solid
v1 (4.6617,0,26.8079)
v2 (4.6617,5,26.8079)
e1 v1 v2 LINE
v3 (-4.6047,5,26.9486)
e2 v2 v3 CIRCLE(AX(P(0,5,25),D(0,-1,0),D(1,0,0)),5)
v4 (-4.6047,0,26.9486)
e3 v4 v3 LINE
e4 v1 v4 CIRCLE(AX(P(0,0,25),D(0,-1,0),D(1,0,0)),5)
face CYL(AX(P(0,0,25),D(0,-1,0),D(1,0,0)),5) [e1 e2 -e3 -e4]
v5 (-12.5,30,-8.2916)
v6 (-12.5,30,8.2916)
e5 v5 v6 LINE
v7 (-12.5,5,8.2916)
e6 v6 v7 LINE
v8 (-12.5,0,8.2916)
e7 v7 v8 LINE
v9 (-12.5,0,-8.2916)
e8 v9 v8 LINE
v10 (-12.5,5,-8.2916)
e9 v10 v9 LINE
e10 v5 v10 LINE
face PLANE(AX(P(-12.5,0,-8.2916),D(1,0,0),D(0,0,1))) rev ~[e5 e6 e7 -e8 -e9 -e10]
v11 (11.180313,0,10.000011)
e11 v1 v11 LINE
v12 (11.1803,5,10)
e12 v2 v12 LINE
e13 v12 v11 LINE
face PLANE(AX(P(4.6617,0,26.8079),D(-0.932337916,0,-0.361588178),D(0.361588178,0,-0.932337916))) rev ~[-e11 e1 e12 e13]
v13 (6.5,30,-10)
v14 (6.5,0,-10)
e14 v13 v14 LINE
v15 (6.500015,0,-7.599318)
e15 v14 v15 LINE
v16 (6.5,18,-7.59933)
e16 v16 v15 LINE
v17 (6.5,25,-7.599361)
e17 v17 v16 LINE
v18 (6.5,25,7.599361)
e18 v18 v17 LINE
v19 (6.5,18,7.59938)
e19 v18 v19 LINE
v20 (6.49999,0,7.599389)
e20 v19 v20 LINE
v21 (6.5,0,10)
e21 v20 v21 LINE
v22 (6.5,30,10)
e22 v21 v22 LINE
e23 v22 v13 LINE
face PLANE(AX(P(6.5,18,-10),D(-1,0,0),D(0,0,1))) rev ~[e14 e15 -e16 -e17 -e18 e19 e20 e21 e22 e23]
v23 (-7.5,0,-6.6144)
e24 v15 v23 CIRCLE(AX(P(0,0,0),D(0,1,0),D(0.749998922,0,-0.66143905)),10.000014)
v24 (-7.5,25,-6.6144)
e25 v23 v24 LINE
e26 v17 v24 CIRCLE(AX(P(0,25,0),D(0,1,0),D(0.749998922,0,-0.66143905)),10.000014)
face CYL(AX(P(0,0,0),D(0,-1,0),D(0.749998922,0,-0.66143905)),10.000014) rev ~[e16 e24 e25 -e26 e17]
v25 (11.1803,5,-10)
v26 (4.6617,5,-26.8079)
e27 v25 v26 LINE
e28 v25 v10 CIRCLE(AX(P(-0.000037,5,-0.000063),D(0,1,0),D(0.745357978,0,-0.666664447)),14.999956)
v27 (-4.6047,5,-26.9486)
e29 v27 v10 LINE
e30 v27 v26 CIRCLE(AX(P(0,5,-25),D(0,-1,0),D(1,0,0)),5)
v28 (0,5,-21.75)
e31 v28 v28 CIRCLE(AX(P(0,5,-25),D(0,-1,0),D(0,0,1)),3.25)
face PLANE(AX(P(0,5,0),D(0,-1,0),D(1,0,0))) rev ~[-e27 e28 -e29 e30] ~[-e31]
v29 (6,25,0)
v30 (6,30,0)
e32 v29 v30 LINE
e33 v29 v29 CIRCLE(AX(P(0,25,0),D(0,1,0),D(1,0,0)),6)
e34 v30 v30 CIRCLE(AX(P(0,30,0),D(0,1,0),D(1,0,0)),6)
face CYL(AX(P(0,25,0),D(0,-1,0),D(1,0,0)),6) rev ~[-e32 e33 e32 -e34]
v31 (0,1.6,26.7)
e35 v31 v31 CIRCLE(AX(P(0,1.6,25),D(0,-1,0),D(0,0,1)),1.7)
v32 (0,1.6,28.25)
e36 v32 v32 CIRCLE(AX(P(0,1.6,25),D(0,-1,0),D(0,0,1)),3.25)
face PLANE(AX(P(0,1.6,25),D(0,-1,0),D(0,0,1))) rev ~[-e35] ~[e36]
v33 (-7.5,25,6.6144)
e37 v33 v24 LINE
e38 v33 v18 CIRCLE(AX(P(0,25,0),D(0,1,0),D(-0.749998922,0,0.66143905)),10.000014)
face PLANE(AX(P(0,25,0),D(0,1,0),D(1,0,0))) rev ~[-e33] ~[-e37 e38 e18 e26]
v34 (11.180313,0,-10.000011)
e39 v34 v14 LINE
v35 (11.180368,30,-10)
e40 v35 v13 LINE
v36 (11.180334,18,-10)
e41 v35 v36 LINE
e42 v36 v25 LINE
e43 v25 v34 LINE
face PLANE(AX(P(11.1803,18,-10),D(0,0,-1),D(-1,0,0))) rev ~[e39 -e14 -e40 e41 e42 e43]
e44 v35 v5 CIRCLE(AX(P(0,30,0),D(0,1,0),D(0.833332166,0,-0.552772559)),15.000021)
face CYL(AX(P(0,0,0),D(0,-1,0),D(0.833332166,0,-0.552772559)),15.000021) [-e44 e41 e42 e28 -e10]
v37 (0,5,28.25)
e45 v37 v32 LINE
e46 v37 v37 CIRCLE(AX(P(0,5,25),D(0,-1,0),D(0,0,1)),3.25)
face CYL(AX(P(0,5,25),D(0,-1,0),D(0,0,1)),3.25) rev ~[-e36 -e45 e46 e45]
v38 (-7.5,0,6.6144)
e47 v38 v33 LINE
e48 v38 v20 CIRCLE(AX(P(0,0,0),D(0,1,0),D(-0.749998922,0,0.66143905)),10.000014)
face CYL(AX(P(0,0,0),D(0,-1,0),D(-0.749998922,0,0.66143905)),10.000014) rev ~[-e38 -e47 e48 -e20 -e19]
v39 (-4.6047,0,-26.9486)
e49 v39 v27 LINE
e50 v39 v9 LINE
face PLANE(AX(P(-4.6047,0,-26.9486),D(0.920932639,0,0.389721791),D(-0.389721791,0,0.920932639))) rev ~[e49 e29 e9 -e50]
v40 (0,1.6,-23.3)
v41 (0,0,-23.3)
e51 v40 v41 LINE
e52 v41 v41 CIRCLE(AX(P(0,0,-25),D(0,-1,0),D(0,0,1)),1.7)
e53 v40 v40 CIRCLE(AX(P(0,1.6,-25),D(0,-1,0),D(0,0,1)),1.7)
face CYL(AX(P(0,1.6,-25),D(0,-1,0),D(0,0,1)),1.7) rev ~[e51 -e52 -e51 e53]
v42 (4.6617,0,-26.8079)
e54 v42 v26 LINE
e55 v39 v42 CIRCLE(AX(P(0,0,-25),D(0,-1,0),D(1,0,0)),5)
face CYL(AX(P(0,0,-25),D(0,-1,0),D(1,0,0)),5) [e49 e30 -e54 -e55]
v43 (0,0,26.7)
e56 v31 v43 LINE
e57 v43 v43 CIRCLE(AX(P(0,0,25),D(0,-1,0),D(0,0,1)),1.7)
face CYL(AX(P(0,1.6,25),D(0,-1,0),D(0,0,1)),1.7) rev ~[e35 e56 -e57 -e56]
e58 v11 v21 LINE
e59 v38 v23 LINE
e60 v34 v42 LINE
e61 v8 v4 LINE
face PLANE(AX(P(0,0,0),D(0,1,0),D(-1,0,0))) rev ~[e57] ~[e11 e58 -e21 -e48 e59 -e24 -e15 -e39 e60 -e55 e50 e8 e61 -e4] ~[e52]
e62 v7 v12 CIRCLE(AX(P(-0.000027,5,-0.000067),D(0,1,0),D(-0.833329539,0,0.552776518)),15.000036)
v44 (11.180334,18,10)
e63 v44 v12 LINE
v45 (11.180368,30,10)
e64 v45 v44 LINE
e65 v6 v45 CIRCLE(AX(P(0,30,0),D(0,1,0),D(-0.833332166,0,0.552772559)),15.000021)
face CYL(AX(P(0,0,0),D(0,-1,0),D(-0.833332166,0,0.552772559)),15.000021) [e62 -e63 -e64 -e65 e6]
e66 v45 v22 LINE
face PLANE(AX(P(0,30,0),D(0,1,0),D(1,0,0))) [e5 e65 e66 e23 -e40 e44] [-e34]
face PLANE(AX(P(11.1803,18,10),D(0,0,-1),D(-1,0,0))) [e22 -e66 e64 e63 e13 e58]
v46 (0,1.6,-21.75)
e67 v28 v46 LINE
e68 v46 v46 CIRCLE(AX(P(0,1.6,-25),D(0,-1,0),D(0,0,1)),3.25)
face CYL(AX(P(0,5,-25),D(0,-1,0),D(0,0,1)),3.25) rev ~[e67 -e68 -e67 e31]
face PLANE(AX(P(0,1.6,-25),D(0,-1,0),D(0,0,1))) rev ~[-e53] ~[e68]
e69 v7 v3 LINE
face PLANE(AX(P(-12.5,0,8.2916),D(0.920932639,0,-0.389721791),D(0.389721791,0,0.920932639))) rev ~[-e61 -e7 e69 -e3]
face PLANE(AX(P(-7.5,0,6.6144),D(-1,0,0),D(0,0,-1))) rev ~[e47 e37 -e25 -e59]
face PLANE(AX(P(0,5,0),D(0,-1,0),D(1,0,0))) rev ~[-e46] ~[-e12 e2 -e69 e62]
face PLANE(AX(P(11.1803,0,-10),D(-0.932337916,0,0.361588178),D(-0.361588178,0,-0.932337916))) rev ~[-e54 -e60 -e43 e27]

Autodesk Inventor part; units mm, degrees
ref_plane "YZ Plane" through (0, 0, 0) normal (1, 0, 0) x (0, 1, 0)
ref_plane "XZ Plane" through (0, 0, 0) normal (0, 1, 0) x (-1, 0, 0)
ref_plane "XY Plane" through (0, 0, 0) normal (0, 0, 1) x (1, 0, 0)
sketch "Sketch1" plane through (0, 0, 0) normal (0, 1, 0) x (-1, 0, 0)
  line L0 (-7.5, 6.6144) -> (7.5, 6.6144) construction
  line L1 (7.5, 6.6144) -> (7.5, -6.6144)
  line L2 (7.5, -6.6144) -> (-7.5, -6.6144) construction
  line L3 (-7.5, -6.6144) -> (-7.5, 6.6144)
  line L4 (-7.5, 6.6144) -> (7.5, -6.6144) construction
  line L5 (7.5, 6.6144) -> (-7.5, -6.6144) construction
  arc A0 (7.5, 6.6144) -> (-7.5, 6.6144) centre (0, 0) ccw
  arc A1 (-7.5, -6.6144) -> (7.5, -6.6144) centre (0, 0) ccw
  line L6 (-12.5, 8.2916) -> (-12.5, -8.2916)
  arc A2 (-12.5, -8.2916) -> (12.5, -8.2916) centre (0, 0) ccw
  line L7 (12.5, -8.2916) -> (12.5, 8.2916)
  arc A3 (12.5, 8.2916) -> (-12.5, 8.2916) centre (0, 0) ccw
  dimension "d1" = 15
  dimension "d2" = 10
  dimension "d3" = 5
extrude "Extrusion1" add sketch "Sketch1" along normal blind 25
sketch "Sketch2" plane through (0, 25, 0) normal (0, 1, 0) x (1, 0, 0)
  arc A0 (12.5, 8.2916) -> (-12.5, 8.2916) centre (0, 0) ccw projected
  line L0 (-12.5, 8.2916) -> (-12.5, -8.2916) projected
  arc A1 (-12.5, -8.2916) -> (12.5, -8.2916) centre (0, 0) ccw projected
  line L1 (12.5, -8.2916) -> (12.5, 8.2916) projected
  line L2 (7.5, 6.6144) -> (7.5, -6.6144) projected
  arc A2 (-7.5, -6.6144) -> (7.5, -6.6144) centre (0, 0) ccw projected
  line L3 (-7.5, -6.6144) -> (-7.5, 6.6144) projected
  arc A3 (7.5, 6.6144) -> (-7.5, 6.6144) centre (0, 0) ccw projected
  circle A4 centre (0, 0) radius 6
  dimension "d6" = 12
extrude "Extrusion2" add sketch "Sketch2" along normal blind 5 contours L1 A1 L0 A0 | L2 A2 L3 A3
sketch "Sketch3" plane through (12.5, 0, 8.2916) normal (1, 0, 0) x (0, 0, -1)
  line L0 (18.2916, 18) -> (-1.7084, 18)
  line L1 (-1.7084, 18) -> (-1.7084, 30)
  line L2 (-1.7084, 30) -> (18.2916, 30)
  line L3 (18.2916, 30) -> (18.2916, 18)
  line L4 (0, 30) -> (16.5831, 30) projected
  point P0 (8.2916, 0)
  point P1 (8.2916, 30)
  dimension "d9" = 12
  dimension "d10" = 20
extrude "Extrusion3" cut sketch "Sketch3" against normal blind 6
sketch "Sketch4" plane through (12.5, 18, 8.2916) normal (0, 1, 0) x (1, 0, 0)
  arc A0 (-1.3197, -1.7084) -> (0, 0) centre (-12.5, 8.2916) ccw projected
  line L0 (0, 16.5831) -> (0, 0) projected
  arc A1 (0, 16.5831) -> (-1.3197, 18.2916) centre (-12.5, 8.2916) ccw projected
  line L1 (-1.3197, 18.2916) -> (-6, 18.2916) projected
  line L2 (-6, 18.2916) -> (-6, 15.8909) projected
  arc A2 (-5, 14.9059) -> (-6, 15.8909) centre (-12.5, 8.2916) ccw projected
  line L3 (-5, 1.6772) -> (-5, 14.9059) projected
  arc A3 (-6, 0.6922) -> (-5, 1.6772) centre (-12.5, 8.2916) ccw projected
  line L4 (-6, 0.6922) -> (-6, -1.7084) projected
  line L5 (-1.3197, -1.7084) -> (-6, -1.7084) projected
  point P0 (-12.5, 8.2916)
extrude "Extrusion4" cut sketch "Sketch4" against normal through all
sketch "Sketch5" plane through (0, 0, 0) normal (0, -1, 0) x (1, 0, 0)
  line L0 (6.5, -10) -> (6.5, -7.5993) projected
  arc A0 (-7.5, -6.6144) -> (6.5, -7.5993) centre (0, 0) ccw projected
  line L1 (-7.5, 6.6144) -> (-7.5, -6.6144) projected
  arc A1 (6.5, 7.5993) -> (-7.5, 6.6144) centre (0, 0) ccw projected
  line L2 (6.5, 7.5993) -> (6.5, 10) projected
  line L3 (6.5, 10) -> (11.1803, 10) projected
  arc A2 (11.1803, 10) -> (-12.5, 8.2916) centre (0, 0) ccw projected
  line L4 (-12.5, -8.2916) -> (-12.5, 8.2916) projected
  arc A3 (-12.5, -8.2916) -> (11.1803, -10) centre (0, 0) ccw projected
  line L5 (11.1803, -10) -> (6.5, -10) projected
  line L6 (0, 25) -> (0, -25)
  circle A4 centre (0, 25) radius 5
  circle A5 centre (0, -25) radius 5
  line L7 (4.6617, 26.8079) -> (11.1803, 10)
  line L8 (11.1803, -10) -> (4.6617, -26.8079)
  line L9 (-4.6047, -26.9486) -> (-12.5, -8.2916)
  line L10 (-12.5, 8.2916) -> (-4.6047, 26.9486)
  dimension "d15" = 50
  dimension "d16" = 10
  dimension "d17" = 10
extrude "Extrusion5" add sketch "Sketch5" against normal blind 5 contours L8 A5 L6 A3 | L6 A5 L9 A3 | A5 | L6 A4 L7 A2 | A2 L10 A4 L6 | A4
sketch "Sketch6" plane through (0, 5, 0) normal (0, 1, 0) x (1, 0, 0)
  line L0 (-12.5, -8.2916) -> (-4.6047, -26.9486) projected
  arc A0 (-4.6047, -26.9486) -> (4.6617, -26.8079) centre (0, -25) ccw projected
  line L1 (4.6617, -26.8079) -> (11.1803, -10) projected
  arc A1 (-12.5, -8.2916) -> (11.1803, -10) centre (0, 0) ccw projected
  arc A2 (11.1803, 10) -> (-12.5, 8.2916) centre (0, 0) ccw projected
  line L2 (11.1803, 10) -> (4.6617, 26.8079) projected
  arc A3 (4.6617, 26.8079) -> (-4.6047, 26.9486) centre (0, 25) ccw projected
  line L3 (-4.6047, 26.9486) -> (-12.5, 8.2916) projected
hole "Hole1" at (0, 5, 25) at (0, 5, -25) direction (0, -1, 0) diameter 3.4 end through all counterbore diameter 6.5 counterbore depth 3.4 clearance for "Socket Head Cap Screw ISO 4762" size "M3" standard "ISO"
properties part number "motor mount"
